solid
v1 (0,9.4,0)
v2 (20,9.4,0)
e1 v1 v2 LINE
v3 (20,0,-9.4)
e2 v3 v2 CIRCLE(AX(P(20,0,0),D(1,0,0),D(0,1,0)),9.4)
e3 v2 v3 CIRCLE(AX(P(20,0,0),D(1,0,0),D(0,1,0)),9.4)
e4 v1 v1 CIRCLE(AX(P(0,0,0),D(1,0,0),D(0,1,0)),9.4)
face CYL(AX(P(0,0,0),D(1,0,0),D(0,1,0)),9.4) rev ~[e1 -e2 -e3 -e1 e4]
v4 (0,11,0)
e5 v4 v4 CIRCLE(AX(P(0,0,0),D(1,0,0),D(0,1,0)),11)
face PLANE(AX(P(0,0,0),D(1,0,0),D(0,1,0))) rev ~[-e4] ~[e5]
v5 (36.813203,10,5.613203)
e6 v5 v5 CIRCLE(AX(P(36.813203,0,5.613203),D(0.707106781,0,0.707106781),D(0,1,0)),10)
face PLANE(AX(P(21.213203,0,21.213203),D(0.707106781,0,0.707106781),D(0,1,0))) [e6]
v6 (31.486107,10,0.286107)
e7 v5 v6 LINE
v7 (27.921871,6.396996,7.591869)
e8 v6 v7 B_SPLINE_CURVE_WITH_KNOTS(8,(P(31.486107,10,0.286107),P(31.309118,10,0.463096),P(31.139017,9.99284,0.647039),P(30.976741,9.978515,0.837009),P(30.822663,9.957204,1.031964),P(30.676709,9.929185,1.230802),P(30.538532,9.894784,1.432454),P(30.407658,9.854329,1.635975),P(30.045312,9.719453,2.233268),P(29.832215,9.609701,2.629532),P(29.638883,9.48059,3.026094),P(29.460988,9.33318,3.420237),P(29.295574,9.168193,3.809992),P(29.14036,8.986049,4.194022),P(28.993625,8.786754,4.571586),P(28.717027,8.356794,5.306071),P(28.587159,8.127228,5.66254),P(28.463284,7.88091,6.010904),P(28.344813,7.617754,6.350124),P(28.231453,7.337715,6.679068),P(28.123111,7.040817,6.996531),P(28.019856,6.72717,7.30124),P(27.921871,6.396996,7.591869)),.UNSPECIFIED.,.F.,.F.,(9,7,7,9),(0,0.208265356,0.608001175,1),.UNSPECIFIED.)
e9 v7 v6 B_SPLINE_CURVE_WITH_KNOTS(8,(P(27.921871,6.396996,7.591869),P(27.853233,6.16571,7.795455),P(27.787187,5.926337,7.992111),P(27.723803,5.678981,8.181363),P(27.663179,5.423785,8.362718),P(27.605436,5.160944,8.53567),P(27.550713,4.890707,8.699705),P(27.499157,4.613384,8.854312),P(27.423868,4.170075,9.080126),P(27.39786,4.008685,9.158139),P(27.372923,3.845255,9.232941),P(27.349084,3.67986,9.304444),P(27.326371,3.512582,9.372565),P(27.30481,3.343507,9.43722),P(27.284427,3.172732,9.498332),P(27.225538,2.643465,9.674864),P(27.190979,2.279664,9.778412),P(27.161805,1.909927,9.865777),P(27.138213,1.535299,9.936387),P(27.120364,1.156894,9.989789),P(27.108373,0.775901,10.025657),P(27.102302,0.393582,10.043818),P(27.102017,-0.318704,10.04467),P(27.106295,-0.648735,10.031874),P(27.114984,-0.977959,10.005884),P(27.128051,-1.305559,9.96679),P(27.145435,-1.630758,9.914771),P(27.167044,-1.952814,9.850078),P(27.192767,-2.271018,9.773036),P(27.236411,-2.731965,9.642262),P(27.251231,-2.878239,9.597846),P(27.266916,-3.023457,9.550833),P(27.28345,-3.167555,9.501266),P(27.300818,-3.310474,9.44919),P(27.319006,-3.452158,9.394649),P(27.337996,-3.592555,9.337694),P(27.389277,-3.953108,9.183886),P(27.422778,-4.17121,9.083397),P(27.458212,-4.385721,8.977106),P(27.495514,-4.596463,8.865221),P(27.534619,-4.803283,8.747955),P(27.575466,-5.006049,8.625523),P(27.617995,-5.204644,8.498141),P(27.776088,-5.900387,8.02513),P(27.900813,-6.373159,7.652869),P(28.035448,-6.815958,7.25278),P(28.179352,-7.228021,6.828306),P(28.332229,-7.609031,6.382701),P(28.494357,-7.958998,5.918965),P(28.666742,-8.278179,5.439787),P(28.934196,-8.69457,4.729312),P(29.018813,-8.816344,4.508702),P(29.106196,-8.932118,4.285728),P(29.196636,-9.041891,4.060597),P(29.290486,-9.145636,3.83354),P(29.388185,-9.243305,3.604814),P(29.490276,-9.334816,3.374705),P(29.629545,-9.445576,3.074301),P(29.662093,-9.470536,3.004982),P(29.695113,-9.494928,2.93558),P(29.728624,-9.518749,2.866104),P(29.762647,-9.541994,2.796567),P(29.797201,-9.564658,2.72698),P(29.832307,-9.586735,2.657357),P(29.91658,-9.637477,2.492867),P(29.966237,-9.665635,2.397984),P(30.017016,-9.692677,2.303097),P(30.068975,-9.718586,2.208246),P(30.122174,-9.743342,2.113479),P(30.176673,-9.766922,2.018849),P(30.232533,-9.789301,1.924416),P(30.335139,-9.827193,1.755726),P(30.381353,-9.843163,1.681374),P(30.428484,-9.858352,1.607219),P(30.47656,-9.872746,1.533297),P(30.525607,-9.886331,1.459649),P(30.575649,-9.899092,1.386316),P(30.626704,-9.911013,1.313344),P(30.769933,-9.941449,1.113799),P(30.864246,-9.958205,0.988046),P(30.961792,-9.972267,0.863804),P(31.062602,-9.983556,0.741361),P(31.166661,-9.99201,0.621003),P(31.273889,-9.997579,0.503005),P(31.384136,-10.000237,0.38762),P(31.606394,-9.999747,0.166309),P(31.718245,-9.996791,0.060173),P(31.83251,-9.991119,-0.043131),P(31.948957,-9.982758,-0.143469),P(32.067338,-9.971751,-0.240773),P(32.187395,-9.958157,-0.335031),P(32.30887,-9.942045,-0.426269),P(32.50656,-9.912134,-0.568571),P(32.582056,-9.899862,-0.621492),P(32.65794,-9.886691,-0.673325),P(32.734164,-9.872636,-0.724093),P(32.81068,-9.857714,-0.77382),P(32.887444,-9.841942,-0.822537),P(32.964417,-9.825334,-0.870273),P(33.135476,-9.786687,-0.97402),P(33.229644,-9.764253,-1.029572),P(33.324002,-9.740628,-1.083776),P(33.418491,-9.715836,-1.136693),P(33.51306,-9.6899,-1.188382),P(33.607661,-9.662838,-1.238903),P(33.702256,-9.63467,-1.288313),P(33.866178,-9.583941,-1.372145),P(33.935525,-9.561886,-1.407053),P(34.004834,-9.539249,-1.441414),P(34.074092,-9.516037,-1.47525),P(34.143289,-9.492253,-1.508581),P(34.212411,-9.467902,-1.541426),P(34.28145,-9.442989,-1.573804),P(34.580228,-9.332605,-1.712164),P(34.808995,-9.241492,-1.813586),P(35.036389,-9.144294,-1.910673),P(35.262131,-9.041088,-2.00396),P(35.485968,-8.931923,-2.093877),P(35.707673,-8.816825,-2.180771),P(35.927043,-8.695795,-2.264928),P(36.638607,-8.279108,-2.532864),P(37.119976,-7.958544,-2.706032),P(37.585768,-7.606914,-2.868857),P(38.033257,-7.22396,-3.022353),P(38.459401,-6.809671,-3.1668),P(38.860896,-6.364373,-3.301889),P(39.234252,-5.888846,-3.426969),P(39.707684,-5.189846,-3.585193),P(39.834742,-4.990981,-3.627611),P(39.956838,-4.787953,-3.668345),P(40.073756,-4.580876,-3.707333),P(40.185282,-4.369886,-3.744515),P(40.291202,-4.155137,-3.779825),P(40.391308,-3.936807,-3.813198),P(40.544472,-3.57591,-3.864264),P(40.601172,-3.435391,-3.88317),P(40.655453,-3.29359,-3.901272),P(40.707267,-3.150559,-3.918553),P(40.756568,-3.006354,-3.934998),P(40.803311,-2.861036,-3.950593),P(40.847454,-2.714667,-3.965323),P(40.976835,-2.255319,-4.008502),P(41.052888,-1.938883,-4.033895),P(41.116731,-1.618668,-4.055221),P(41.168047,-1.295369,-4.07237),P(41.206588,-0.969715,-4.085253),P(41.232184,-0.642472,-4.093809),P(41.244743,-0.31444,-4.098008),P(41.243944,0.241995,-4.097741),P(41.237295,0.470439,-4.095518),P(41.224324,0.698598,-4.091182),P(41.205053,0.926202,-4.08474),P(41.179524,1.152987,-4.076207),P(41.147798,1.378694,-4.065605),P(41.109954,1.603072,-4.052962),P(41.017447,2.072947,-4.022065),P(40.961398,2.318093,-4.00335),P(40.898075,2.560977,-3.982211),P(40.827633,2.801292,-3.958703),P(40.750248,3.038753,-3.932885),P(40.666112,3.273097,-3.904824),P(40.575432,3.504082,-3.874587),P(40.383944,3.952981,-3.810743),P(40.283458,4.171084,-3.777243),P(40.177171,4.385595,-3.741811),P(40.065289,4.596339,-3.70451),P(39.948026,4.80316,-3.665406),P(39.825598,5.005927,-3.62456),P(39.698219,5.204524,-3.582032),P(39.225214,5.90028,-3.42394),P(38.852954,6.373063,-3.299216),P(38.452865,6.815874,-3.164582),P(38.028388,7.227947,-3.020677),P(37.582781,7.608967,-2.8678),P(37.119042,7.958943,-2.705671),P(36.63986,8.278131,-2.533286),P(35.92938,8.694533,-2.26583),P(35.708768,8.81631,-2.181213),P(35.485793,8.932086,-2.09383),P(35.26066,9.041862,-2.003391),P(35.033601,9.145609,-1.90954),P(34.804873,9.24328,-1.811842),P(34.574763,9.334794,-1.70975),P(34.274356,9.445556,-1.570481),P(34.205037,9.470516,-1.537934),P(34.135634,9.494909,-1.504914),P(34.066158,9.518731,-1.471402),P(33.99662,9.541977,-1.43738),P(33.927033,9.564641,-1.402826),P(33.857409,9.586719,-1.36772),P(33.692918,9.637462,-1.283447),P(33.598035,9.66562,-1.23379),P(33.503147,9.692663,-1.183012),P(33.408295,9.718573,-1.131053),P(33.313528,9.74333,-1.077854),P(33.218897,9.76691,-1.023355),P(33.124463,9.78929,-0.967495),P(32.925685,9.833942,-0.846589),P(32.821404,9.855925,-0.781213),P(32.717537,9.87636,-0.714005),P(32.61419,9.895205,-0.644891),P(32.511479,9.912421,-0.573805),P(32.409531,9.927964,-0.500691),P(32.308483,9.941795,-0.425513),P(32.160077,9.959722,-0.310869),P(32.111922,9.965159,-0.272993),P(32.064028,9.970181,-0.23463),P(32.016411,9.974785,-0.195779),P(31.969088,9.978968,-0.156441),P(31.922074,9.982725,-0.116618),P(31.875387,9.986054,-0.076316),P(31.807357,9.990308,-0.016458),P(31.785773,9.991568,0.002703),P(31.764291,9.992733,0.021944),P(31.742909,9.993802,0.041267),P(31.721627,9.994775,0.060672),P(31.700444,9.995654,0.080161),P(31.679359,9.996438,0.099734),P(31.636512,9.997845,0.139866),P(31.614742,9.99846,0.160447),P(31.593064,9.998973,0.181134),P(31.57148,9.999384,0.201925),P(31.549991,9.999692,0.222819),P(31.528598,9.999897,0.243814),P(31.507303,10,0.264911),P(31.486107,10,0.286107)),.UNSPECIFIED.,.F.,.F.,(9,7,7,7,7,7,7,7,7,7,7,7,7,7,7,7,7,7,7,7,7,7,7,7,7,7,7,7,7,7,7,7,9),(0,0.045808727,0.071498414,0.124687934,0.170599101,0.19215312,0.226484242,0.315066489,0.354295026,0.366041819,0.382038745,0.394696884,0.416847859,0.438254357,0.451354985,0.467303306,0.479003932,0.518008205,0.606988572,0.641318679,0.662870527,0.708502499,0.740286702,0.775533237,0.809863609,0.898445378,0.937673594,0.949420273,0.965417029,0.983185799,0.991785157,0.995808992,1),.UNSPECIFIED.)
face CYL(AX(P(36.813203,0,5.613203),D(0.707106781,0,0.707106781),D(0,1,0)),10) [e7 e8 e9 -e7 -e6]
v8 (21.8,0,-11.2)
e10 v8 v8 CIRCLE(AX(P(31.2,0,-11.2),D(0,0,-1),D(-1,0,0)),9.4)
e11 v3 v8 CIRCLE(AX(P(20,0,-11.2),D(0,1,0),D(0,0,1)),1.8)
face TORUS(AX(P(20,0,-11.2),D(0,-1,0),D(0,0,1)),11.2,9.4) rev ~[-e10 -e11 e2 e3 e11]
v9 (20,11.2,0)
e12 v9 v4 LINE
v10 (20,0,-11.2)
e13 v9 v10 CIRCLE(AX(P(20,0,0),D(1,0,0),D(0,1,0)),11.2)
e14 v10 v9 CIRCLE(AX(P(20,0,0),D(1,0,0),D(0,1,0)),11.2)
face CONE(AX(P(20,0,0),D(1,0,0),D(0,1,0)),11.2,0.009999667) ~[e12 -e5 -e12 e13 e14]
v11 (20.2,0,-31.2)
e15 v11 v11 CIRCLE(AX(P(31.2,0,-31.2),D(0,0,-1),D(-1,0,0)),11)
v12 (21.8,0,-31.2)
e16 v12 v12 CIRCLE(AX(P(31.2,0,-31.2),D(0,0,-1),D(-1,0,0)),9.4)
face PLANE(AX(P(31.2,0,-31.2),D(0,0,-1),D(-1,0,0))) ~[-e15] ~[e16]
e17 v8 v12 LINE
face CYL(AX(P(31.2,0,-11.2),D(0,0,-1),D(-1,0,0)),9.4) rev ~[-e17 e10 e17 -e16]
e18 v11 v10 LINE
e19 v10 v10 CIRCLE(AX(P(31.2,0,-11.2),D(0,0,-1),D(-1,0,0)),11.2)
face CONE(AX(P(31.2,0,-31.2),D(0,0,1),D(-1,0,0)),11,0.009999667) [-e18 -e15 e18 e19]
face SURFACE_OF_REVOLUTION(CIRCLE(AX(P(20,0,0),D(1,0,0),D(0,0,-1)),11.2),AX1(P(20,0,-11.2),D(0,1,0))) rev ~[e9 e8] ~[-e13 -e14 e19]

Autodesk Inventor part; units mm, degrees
ref_plane "XZ Plane" through (0, 0, 0) normal (0, 1, 0) x (-1, 0, 0)
ref_plane "XY Plane" through (0, 0, 0) normal (0, 0, 1) x (1, 0, 0)
sketch "Sketch1" plane through (0, 0, 0) normal (0, 0, 1) x (1, 0, 0)
  line L0 (0, 0) -> (0, 11) construction
  line L1 (0, 0) -> (20, 0) construction
  line L2 (20, 0) -> (20, 11.2) construction
  line L3 (0, 11) -> (20, 11.2)
  line L4 (0, 9.4) -> (20, 9.4)
  line L5 (20, 9.4) -> (20, 11.2)
  line L6 (0, 9.4) -> (0, 11)
  dimension "d0" = 11
  dimension "d1" = 20
  dimension "d2" = 11.2
  dimension "d3" = 1.6
sketch "Sketch1 outline for Revolution1" plane through (0, 0, 0) normal (0, 0, 1) x (1, 0, 0)
  line L0 (20, 9.4) -> (20, 11.2)
  line L1 (0, 9.4) -> (20, 9.4)
  line L2 (0, 11) -> (0, 9.4)
  line L3 (20, 11.2) -> (0, 11)
revolve "Revolution1" add sketch "Sketch1 outline for Revolution1" angle 360 about axis through (0, 0, 0) along (1, 0, 0)
sketch "Sketch2" plane through (20, 0, 0) normal (1, 0, 0) x (0, 0, -1)
  line L0 (0, 0) -> (11.2, 0) construction
  circle A0 centre (0, 0) radius 11.2 construction
  line L1 (11.2, 0) -> (11.2, 11.2) construction
  circle A1 centre (0, 0) radius 11.2
  circle A2 centre (0, 0) radius 9.4 projected
  dimension "d5" = 11.2
sketch "Sketch2 outline for Revolution2" plane through (20, 0, 0) normal (1, 0, 0) x (0, 0, -1)
  circle A0 centre (0, 0) radius 11.2
  circle A1 centre (0, 0) radius 9.4
revolve "Revolution2" add sketch "Sketch2 outline for Revolution2" angle 90 about axis through (20, 0, -11.2) along (0, 1, 0)
sketch "Sketch3" plane through (0, 0, 0) normal (0, 1, 0) x (-1, 0, 0)
  line L0 (-42.4, -11.2) -> (-20, -11.2) construction
  line L1 (-31.2, -11.2) -> (-31.2, -31.2) construction
  line L2 (-31.2, -11.2) -> (-11.2, -11.2) construction
  line L3 (-31.2, -31.2) -> (-20.2, -31.2) construction
  line L4 (-20.2, -31.2) -> (-20, -11.2)
  line L5 (-20.2, -31.2) -> (-21.8, -31.2)
  line L6 (-21.8, -31.2) -> (-21.8, -11.2)
  line L7 (-20, -11.2) -> (-21.8, -11.2)
  point P0 (0, 0)
  dimension "d7" = 20
  dimension "d8" = 90
  dimension "d9" = 11
  dimension "d10" = 1.6
sketch "Sketch3 outline for Revolution3" plane through (0, 0, 0) normal (0, 1, 0) x (-1, 0, 0)
  line L0 (-20.2, -31.2) -> (-20, -11.2)
  line L1 (-21.8, -31.2) -> (-20.2, -31.2)
  line L2 (-21.8, -11.2) -> (-21.8, -31.2)
  line L3 (-20, -11.2) -> (-21.8, -11.2)
revolve "Revolution3" add sketch "Sketch3 outline for Revolution3" angle 360 about axis through (31.2, 0, -11.2) along (0, 0, -1)
ref_plane "Work Plane2" through (21.213203, 0, 21.213203) normal (0.7071068, 0, 0.7071068) x (0, 1, 0)
ref_plane "Work Plane1" through (0, 0, 0) normal (0.7071068, 0, 0.7071068) x (0, 1, 0)
sketch "Sketch4" plane through (21.213203, 0, 21.213203) normal (0.7071068, 0, 0.7071068) x (0, 1, 0)
  ellipse E0 centre (0, -14.142136) end of major axis (11.2, -14.142136) minor radius 7.919596 construction
  ellipse E1 centre (0, -29.981328) end of major axis (11.2, -29.981328) minor radius 7.919596 construction
  line L0 (0, -14.142136) -> (0, -29.981328) construction
  circle A0 centre (0, -22.061732) radius 10
  point P0 (0, 0)
  dimension "d14" = 20
sketch "Sketch4 outline for Extrusion1" plane through (21.213203, 0, 21.213203) normal (0.7071068, 0, 0.7071068) x (0, 1, 0)
  circle A0 centre (0, -22.061732) radius 10
extrude "Extrusion1" add sketch "Sketch4 outline for Extrusion1" against normal up to surface
equation "\"d0\" = 0.5 * TMStart"
equation "\"d1\" = TDepth"
equation "\"d2\" = 0.5 * TMEnd"
equation "\"d3\" = WallT"
equation "\"d5\" = BendR"
equation "\"d7\" = TDepth"
equation "\"d9\" = 0.5 * TMStart"
equation "\"d10\" = WallT"
equation "\"TMStart\" = 22"
equation "\"TMEnd\" = 22.4"
equation "\"WallT\" = 1.6"
equation "\"TDepth\" = 20"
equation "\"BendR\" = 0.5 * TMEnd"
properties part number "MtoM90degree"
